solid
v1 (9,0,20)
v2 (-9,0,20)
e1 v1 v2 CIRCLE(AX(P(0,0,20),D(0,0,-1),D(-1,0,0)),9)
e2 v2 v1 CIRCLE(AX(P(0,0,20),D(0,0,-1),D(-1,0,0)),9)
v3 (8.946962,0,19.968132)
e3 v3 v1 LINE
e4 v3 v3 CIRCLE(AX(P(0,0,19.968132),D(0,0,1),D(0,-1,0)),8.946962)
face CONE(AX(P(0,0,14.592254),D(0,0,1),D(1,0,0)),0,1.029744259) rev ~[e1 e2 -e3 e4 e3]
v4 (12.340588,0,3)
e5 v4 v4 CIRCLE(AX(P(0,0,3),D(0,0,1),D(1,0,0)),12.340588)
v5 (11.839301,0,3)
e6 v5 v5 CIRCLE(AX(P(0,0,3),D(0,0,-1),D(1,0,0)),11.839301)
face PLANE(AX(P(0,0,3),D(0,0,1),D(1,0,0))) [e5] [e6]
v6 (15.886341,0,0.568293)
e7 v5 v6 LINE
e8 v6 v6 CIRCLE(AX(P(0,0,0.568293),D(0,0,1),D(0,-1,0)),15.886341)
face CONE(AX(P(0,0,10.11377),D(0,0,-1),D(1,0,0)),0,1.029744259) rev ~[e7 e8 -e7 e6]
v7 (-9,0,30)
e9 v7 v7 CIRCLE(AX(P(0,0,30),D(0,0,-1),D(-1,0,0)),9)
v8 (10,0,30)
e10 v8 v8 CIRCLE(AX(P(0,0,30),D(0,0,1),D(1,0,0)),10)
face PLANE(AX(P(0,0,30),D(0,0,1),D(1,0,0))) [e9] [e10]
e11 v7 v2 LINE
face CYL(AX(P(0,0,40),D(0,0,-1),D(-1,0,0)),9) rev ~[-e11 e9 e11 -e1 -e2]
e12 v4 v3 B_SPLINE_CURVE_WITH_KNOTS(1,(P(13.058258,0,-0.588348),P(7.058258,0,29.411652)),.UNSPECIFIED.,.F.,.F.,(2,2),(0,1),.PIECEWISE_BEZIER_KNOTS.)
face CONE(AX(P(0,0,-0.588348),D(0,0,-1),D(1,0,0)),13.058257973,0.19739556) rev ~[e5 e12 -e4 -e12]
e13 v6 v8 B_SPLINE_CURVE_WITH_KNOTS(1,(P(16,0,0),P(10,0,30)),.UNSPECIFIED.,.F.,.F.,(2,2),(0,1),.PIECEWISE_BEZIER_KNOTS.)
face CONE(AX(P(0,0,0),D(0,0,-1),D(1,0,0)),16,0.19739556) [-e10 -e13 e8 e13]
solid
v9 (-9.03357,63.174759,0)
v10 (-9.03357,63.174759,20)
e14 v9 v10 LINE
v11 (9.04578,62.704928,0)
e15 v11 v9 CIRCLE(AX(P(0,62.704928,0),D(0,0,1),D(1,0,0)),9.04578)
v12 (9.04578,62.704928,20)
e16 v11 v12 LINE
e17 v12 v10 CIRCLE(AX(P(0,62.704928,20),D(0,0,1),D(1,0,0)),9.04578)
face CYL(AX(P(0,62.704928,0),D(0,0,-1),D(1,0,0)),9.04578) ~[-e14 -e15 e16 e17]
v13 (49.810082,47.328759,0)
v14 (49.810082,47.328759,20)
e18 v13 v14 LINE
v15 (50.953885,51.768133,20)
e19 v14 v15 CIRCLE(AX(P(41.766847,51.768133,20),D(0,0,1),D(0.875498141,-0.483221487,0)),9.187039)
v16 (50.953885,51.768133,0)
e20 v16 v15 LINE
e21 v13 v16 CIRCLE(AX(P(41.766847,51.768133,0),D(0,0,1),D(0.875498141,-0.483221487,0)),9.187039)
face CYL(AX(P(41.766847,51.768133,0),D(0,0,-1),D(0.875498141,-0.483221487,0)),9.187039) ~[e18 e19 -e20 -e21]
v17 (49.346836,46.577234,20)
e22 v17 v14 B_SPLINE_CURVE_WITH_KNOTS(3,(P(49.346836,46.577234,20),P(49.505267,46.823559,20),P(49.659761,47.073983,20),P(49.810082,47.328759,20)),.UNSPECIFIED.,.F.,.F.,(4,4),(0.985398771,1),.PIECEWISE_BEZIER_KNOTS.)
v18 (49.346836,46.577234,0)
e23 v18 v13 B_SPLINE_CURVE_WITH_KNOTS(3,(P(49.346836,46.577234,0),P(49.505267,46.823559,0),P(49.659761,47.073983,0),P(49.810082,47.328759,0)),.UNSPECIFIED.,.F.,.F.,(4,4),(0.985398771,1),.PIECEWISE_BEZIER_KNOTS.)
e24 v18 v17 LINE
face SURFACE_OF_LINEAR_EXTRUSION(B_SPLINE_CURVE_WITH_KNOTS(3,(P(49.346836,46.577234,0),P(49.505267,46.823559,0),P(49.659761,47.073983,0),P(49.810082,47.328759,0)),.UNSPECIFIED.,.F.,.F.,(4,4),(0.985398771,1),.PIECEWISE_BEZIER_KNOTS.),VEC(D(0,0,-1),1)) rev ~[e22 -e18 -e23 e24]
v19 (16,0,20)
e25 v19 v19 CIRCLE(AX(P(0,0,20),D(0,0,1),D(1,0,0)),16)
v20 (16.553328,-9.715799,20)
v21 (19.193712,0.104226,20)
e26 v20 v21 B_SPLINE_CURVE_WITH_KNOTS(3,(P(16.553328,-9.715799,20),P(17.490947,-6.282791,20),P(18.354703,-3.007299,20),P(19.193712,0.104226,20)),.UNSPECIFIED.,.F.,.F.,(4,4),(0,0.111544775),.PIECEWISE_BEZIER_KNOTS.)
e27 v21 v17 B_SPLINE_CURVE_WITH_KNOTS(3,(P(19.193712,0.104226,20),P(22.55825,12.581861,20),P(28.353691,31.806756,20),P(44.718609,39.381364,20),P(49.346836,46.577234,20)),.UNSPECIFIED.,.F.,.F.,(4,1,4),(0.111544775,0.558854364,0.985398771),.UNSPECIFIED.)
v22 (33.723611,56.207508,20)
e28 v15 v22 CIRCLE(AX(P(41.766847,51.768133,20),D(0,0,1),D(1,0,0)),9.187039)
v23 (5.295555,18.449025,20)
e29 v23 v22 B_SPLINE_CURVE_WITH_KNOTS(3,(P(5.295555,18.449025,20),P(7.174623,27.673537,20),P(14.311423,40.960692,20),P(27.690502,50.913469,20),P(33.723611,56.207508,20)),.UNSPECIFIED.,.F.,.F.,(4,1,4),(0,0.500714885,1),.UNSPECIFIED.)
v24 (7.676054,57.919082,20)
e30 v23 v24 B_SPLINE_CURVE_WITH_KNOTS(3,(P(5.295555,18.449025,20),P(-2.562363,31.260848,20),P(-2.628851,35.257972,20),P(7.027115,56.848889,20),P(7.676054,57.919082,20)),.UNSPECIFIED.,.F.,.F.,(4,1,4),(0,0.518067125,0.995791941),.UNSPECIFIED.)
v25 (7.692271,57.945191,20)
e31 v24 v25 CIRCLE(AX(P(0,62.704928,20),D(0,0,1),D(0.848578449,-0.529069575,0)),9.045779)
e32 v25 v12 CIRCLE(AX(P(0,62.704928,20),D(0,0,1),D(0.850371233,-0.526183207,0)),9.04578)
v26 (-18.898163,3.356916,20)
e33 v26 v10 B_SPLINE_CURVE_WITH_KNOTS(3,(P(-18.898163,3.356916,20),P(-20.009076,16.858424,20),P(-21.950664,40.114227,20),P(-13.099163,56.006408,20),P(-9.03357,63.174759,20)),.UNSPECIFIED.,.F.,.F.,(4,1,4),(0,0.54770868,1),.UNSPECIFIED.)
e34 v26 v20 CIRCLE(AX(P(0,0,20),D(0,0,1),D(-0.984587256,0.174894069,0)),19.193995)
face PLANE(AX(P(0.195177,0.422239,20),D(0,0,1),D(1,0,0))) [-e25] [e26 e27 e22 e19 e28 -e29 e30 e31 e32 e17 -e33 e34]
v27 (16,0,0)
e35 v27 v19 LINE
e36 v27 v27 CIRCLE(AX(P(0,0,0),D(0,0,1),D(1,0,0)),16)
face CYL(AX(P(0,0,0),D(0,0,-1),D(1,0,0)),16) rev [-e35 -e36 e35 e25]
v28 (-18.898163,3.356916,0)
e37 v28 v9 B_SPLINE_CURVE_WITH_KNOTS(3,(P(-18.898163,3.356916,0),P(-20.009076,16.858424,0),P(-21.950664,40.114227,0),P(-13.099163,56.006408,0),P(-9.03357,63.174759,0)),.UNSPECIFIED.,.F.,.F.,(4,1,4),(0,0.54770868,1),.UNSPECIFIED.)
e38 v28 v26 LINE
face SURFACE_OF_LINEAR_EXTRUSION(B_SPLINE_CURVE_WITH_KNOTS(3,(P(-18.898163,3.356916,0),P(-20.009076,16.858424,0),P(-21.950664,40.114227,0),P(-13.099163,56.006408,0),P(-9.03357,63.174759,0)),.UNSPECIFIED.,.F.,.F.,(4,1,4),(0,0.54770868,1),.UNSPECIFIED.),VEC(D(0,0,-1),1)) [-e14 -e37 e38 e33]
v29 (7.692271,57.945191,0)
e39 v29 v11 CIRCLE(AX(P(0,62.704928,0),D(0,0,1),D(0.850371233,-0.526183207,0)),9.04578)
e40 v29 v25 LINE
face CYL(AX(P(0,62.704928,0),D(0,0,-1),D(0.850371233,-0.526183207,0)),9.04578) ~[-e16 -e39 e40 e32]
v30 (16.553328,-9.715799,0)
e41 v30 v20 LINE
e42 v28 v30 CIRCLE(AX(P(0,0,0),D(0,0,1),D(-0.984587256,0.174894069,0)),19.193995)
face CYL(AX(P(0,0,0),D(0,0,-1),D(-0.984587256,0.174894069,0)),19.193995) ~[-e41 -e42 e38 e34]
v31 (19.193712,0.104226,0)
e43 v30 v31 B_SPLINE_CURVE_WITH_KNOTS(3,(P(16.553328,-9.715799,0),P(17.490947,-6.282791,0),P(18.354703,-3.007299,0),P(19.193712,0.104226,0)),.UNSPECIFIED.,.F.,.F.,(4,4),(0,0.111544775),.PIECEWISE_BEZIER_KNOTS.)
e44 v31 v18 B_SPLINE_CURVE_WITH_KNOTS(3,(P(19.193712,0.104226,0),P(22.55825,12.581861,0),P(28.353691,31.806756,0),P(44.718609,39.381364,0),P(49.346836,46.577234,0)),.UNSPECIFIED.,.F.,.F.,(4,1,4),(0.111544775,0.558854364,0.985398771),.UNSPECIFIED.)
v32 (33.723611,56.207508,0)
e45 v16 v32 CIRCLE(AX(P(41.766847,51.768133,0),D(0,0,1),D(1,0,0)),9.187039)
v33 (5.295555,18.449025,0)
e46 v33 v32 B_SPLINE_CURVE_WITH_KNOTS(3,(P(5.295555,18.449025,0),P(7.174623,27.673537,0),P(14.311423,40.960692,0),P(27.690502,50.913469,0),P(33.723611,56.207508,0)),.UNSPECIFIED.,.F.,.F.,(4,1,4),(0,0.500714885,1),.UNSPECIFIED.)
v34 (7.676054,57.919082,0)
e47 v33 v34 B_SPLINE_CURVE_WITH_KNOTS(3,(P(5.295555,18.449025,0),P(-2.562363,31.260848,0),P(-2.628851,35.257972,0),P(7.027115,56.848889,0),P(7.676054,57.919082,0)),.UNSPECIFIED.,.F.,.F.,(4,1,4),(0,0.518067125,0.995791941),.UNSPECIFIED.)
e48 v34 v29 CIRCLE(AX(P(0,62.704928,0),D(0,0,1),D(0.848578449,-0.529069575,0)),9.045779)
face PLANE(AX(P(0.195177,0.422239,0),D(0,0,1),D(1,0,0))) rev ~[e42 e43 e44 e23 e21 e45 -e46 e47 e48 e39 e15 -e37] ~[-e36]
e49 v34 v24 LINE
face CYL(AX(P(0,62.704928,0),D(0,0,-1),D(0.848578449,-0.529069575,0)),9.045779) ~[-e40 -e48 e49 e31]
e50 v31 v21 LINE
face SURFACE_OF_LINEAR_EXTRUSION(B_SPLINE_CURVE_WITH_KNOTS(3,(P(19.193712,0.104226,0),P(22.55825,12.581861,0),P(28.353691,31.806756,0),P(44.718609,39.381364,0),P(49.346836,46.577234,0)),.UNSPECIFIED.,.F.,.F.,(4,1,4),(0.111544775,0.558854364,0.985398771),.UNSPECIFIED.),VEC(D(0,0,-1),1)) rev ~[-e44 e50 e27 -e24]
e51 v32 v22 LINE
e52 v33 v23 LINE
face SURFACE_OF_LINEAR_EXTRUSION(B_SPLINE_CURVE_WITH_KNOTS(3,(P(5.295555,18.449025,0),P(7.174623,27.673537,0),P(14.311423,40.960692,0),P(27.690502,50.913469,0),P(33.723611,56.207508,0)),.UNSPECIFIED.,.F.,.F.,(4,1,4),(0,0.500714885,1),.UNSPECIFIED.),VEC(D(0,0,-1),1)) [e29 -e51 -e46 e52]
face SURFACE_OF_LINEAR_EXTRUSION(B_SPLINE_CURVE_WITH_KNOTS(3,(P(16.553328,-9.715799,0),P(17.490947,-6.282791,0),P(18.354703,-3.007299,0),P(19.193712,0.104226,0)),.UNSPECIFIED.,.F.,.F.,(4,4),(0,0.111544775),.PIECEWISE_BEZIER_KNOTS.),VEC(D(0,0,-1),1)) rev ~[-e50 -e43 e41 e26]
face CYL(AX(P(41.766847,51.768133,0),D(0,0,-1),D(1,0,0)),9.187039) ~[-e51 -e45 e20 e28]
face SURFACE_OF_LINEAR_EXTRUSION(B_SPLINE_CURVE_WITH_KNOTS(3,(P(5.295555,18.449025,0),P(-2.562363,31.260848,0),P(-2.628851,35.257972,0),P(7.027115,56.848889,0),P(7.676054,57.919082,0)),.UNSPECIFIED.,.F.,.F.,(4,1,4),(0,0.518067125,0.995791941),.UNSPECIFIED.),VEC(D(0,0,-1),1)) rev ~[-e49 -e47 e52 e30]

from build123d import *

# Parameters (mm, degrees)
F0_R     = 16
F2_R     = 10
F4_T     = -3
F5_DEPTH = 20
F6_D     = 18
F6_DEPTH = 10
F6_TIP   = 5.4077455712
F7_D     = 32
F7_DEPTH = 0.5
F7_TIP   = 9.6137699044


# Not quite as in the source:
# - a feature names something its author has since deleted; it is built from what else it names


with BuildPart() as f3:
    # F0 (on Top) → F3 section 0
    with BuildSketch(Plane.XY):
        Circle(F0_R)
    # F2 (on offset) → F3 section 1
    with BuildSketch(Plane.XY.offset(30)):
        Circle(F2_R)
    loft()

    # F4 (hollow: no face is removed)
    offset(amount=F4_T, mode=Mode.SUBTRACT)

    # F6
    with Locations(Plane.XY.offset(30)):
        with Locations((0, 0)):
            Hole(F6_D / 2, depth=F6_DEPTH)
            with Locations((0, 0, -(F6_DEPTH + F6_TIP / 2))):  # 118° drill point
                Cone(0, F6_D / 2, F6_TIP, mode=Mode.SUBTRACT)

    # F7
    with Locations(Plane(origin=(0, 0, 0), x_dir=(1, 0, 0), z_dir=(0, 0, -1))):
        with Locations((0, 0)):
            Hole(F7_D / 2, depth=F7_DEPTH)
            with Locations((0, 0, -(F7_DEPTH + F7_TIP / 2))):  # 118° drill point
                Cone(0, F7_D / 2, F7_TIP, mode=Mode.SUBTRACT)


with BuildPart() as f5:
    # F0 (on Top) → F5 (new body)
    with BuildSketch(Plane.XY):
        with BuildLine():
            ThreePointArc((19.1937116741, 0.1042258071), (15.2991489183, 11.5907494677), (5.2955546416, 18.4490252286))
            ThreePointArc((5.2955546416, 18.4490252286), (-10.1587733981, 16.2852311588), (-18.8981625306, 3.3569158189))
            ThreePointArc((-18.8981625306, 3.3569158189), (-6.6406726309, -18.0086339809), (16.5533281406, -9.7157994173))
            add(Edge.make_bspline(
                [(16.5533281406, -9.7157994173), (17.4909471556, -6.282790694), (18.3547028822, -3.0072993549), (19.1937116741, 0.1042258071)],
                knots=[0, 0, 0, 0, 0.1115447748, 0.1115447748, 0.1115447748, 0.1115447748], degree=3))
        make_face()
        Circle(F0_R, mode=Mode.SUBTRACT)
        with BuildLine():
            add(Edge.make_bspline(
                [(5.2955546416, 18.4490252286), (7.1746227331, 27.6735369116), (14.3114232279, 40.9606919462), (27.690502152, 50.9134689797), (33.7236113846, 56.2075078487)],
                knots=[0, 0, 0, 0, 0.5007148854, 1, 1, 1, 1], degree=3))
            ThreePointArc((5.2955546416, 18.4490252286), (15.2991489183, 11.5907494677), (19.1937116741, 0.1042258071))
            add(Edge.make_bspline(
                [(19.1937116741, 0.1042258071), (22.5582500765, 12.5818613195), (28.3536912987, 31.8067560439), (44.7186086588, 39.3813644075), (49.3468357907, 46.577233643)],
                knots=[0.1115447748, 0.1115447748, 0.1115447748, 0.1115447748, 0.5588543644, 0.9853987705, 0.9853987705, 0.9853987705, 0.9853987705], degree=3))
            ThreePointArc((49.3468357907, 46.577233643), (36.9461417786, 43.9474887633), (33.7236113846, 56.2075078487))
        make_face()
        with BuildLine():
            ThreePointArc((-18.8981625306, 3.3569158189), (-10.1587733981, 16.2852311588), (5.2955546416, 18.4490252286))
            add(Edge.make_bspline(
                [(5.2955546416, 18.4490252286), (-2.5623629335, 31.2608480453), (-2.628851385, 35.2579723672), (7.0271153581, 56.848888653), (7.6760536531, 57.9190816164)],
                knots=[0, 0, 0, 0, 0.5180671246, 0.9957919408, 0.9957919408, 0.9957919408, 0.9957919408], degree=3))
            ThreePointArc((7.6760536531, 57.9190816164), (-2.7140834876, 54.0759145506), (-9.0335700658, 63.1747591085))
            add(Edge.make_bspline(
                [(-18.8981625306, 3.3569158189), (-20.0090761688, 16.85842438), (-21.9506635835, 40.1142274591), (-13.0991634095, 56.0064077769), (-9.0335700658, 63.1747591085)],
                knots=[0, 0, 0, 0, 0.5477086796, 1, 1, 1, 1], degree=3))
        make_face()
        with BuildLine():
            ThreePointArc((-9.0335700658, 63.1747591085), (-2.7140834876, 54.0759145506), (7.6760536531, 57.9190816164))
            ThreePointArc((7.6760536531, 57.9190816164), (7.6841733008, 57.9321294513), (7.6922707696, 57.9451910618))
            ThreePointArc((7.6922707696, 57.9451910618), (8.7008251114, 60.2307070152), (9.0457796257, 62.704928391))
            ThreePointArc((9.0457796257, 62.704928391), (0.2349946683, 71.7476551115), (-9.0335700658, 63.1747591085))
        make_face()
        with BuildLine():
            ThreePointArc((50.9538851021, 51.7681334168), (44.0590251845, 60.6646267952), (33.7236113846, 56.2075078487))
            ThreePointArc((33.7236113846, 56.2075078487), (36.9461417786, 43.9474887633), (49.3468357907, 46.577233643))
            add(Edge.make_bspline(
                [(49.3468357907, 46.577233643), (49.5052666724, 46.8235586126), (49.6597605763, 47.0739831673), (49.8100817204, 47.3287589848)],
                knots=[0.9853987705, 0.9853987705, 0.9853987705, 0.9853987705, 1, 1, 1, 1], degree=3))
            ThreePointArc((49.8100817204, 47.3287589848), (50.6633399309, 49.4759547848), (50.9538851021, 51.7681334168))
        make_face()
    extrude(amount=F5_DEPTH)


solid = Compound([f3.part, f5.part])
